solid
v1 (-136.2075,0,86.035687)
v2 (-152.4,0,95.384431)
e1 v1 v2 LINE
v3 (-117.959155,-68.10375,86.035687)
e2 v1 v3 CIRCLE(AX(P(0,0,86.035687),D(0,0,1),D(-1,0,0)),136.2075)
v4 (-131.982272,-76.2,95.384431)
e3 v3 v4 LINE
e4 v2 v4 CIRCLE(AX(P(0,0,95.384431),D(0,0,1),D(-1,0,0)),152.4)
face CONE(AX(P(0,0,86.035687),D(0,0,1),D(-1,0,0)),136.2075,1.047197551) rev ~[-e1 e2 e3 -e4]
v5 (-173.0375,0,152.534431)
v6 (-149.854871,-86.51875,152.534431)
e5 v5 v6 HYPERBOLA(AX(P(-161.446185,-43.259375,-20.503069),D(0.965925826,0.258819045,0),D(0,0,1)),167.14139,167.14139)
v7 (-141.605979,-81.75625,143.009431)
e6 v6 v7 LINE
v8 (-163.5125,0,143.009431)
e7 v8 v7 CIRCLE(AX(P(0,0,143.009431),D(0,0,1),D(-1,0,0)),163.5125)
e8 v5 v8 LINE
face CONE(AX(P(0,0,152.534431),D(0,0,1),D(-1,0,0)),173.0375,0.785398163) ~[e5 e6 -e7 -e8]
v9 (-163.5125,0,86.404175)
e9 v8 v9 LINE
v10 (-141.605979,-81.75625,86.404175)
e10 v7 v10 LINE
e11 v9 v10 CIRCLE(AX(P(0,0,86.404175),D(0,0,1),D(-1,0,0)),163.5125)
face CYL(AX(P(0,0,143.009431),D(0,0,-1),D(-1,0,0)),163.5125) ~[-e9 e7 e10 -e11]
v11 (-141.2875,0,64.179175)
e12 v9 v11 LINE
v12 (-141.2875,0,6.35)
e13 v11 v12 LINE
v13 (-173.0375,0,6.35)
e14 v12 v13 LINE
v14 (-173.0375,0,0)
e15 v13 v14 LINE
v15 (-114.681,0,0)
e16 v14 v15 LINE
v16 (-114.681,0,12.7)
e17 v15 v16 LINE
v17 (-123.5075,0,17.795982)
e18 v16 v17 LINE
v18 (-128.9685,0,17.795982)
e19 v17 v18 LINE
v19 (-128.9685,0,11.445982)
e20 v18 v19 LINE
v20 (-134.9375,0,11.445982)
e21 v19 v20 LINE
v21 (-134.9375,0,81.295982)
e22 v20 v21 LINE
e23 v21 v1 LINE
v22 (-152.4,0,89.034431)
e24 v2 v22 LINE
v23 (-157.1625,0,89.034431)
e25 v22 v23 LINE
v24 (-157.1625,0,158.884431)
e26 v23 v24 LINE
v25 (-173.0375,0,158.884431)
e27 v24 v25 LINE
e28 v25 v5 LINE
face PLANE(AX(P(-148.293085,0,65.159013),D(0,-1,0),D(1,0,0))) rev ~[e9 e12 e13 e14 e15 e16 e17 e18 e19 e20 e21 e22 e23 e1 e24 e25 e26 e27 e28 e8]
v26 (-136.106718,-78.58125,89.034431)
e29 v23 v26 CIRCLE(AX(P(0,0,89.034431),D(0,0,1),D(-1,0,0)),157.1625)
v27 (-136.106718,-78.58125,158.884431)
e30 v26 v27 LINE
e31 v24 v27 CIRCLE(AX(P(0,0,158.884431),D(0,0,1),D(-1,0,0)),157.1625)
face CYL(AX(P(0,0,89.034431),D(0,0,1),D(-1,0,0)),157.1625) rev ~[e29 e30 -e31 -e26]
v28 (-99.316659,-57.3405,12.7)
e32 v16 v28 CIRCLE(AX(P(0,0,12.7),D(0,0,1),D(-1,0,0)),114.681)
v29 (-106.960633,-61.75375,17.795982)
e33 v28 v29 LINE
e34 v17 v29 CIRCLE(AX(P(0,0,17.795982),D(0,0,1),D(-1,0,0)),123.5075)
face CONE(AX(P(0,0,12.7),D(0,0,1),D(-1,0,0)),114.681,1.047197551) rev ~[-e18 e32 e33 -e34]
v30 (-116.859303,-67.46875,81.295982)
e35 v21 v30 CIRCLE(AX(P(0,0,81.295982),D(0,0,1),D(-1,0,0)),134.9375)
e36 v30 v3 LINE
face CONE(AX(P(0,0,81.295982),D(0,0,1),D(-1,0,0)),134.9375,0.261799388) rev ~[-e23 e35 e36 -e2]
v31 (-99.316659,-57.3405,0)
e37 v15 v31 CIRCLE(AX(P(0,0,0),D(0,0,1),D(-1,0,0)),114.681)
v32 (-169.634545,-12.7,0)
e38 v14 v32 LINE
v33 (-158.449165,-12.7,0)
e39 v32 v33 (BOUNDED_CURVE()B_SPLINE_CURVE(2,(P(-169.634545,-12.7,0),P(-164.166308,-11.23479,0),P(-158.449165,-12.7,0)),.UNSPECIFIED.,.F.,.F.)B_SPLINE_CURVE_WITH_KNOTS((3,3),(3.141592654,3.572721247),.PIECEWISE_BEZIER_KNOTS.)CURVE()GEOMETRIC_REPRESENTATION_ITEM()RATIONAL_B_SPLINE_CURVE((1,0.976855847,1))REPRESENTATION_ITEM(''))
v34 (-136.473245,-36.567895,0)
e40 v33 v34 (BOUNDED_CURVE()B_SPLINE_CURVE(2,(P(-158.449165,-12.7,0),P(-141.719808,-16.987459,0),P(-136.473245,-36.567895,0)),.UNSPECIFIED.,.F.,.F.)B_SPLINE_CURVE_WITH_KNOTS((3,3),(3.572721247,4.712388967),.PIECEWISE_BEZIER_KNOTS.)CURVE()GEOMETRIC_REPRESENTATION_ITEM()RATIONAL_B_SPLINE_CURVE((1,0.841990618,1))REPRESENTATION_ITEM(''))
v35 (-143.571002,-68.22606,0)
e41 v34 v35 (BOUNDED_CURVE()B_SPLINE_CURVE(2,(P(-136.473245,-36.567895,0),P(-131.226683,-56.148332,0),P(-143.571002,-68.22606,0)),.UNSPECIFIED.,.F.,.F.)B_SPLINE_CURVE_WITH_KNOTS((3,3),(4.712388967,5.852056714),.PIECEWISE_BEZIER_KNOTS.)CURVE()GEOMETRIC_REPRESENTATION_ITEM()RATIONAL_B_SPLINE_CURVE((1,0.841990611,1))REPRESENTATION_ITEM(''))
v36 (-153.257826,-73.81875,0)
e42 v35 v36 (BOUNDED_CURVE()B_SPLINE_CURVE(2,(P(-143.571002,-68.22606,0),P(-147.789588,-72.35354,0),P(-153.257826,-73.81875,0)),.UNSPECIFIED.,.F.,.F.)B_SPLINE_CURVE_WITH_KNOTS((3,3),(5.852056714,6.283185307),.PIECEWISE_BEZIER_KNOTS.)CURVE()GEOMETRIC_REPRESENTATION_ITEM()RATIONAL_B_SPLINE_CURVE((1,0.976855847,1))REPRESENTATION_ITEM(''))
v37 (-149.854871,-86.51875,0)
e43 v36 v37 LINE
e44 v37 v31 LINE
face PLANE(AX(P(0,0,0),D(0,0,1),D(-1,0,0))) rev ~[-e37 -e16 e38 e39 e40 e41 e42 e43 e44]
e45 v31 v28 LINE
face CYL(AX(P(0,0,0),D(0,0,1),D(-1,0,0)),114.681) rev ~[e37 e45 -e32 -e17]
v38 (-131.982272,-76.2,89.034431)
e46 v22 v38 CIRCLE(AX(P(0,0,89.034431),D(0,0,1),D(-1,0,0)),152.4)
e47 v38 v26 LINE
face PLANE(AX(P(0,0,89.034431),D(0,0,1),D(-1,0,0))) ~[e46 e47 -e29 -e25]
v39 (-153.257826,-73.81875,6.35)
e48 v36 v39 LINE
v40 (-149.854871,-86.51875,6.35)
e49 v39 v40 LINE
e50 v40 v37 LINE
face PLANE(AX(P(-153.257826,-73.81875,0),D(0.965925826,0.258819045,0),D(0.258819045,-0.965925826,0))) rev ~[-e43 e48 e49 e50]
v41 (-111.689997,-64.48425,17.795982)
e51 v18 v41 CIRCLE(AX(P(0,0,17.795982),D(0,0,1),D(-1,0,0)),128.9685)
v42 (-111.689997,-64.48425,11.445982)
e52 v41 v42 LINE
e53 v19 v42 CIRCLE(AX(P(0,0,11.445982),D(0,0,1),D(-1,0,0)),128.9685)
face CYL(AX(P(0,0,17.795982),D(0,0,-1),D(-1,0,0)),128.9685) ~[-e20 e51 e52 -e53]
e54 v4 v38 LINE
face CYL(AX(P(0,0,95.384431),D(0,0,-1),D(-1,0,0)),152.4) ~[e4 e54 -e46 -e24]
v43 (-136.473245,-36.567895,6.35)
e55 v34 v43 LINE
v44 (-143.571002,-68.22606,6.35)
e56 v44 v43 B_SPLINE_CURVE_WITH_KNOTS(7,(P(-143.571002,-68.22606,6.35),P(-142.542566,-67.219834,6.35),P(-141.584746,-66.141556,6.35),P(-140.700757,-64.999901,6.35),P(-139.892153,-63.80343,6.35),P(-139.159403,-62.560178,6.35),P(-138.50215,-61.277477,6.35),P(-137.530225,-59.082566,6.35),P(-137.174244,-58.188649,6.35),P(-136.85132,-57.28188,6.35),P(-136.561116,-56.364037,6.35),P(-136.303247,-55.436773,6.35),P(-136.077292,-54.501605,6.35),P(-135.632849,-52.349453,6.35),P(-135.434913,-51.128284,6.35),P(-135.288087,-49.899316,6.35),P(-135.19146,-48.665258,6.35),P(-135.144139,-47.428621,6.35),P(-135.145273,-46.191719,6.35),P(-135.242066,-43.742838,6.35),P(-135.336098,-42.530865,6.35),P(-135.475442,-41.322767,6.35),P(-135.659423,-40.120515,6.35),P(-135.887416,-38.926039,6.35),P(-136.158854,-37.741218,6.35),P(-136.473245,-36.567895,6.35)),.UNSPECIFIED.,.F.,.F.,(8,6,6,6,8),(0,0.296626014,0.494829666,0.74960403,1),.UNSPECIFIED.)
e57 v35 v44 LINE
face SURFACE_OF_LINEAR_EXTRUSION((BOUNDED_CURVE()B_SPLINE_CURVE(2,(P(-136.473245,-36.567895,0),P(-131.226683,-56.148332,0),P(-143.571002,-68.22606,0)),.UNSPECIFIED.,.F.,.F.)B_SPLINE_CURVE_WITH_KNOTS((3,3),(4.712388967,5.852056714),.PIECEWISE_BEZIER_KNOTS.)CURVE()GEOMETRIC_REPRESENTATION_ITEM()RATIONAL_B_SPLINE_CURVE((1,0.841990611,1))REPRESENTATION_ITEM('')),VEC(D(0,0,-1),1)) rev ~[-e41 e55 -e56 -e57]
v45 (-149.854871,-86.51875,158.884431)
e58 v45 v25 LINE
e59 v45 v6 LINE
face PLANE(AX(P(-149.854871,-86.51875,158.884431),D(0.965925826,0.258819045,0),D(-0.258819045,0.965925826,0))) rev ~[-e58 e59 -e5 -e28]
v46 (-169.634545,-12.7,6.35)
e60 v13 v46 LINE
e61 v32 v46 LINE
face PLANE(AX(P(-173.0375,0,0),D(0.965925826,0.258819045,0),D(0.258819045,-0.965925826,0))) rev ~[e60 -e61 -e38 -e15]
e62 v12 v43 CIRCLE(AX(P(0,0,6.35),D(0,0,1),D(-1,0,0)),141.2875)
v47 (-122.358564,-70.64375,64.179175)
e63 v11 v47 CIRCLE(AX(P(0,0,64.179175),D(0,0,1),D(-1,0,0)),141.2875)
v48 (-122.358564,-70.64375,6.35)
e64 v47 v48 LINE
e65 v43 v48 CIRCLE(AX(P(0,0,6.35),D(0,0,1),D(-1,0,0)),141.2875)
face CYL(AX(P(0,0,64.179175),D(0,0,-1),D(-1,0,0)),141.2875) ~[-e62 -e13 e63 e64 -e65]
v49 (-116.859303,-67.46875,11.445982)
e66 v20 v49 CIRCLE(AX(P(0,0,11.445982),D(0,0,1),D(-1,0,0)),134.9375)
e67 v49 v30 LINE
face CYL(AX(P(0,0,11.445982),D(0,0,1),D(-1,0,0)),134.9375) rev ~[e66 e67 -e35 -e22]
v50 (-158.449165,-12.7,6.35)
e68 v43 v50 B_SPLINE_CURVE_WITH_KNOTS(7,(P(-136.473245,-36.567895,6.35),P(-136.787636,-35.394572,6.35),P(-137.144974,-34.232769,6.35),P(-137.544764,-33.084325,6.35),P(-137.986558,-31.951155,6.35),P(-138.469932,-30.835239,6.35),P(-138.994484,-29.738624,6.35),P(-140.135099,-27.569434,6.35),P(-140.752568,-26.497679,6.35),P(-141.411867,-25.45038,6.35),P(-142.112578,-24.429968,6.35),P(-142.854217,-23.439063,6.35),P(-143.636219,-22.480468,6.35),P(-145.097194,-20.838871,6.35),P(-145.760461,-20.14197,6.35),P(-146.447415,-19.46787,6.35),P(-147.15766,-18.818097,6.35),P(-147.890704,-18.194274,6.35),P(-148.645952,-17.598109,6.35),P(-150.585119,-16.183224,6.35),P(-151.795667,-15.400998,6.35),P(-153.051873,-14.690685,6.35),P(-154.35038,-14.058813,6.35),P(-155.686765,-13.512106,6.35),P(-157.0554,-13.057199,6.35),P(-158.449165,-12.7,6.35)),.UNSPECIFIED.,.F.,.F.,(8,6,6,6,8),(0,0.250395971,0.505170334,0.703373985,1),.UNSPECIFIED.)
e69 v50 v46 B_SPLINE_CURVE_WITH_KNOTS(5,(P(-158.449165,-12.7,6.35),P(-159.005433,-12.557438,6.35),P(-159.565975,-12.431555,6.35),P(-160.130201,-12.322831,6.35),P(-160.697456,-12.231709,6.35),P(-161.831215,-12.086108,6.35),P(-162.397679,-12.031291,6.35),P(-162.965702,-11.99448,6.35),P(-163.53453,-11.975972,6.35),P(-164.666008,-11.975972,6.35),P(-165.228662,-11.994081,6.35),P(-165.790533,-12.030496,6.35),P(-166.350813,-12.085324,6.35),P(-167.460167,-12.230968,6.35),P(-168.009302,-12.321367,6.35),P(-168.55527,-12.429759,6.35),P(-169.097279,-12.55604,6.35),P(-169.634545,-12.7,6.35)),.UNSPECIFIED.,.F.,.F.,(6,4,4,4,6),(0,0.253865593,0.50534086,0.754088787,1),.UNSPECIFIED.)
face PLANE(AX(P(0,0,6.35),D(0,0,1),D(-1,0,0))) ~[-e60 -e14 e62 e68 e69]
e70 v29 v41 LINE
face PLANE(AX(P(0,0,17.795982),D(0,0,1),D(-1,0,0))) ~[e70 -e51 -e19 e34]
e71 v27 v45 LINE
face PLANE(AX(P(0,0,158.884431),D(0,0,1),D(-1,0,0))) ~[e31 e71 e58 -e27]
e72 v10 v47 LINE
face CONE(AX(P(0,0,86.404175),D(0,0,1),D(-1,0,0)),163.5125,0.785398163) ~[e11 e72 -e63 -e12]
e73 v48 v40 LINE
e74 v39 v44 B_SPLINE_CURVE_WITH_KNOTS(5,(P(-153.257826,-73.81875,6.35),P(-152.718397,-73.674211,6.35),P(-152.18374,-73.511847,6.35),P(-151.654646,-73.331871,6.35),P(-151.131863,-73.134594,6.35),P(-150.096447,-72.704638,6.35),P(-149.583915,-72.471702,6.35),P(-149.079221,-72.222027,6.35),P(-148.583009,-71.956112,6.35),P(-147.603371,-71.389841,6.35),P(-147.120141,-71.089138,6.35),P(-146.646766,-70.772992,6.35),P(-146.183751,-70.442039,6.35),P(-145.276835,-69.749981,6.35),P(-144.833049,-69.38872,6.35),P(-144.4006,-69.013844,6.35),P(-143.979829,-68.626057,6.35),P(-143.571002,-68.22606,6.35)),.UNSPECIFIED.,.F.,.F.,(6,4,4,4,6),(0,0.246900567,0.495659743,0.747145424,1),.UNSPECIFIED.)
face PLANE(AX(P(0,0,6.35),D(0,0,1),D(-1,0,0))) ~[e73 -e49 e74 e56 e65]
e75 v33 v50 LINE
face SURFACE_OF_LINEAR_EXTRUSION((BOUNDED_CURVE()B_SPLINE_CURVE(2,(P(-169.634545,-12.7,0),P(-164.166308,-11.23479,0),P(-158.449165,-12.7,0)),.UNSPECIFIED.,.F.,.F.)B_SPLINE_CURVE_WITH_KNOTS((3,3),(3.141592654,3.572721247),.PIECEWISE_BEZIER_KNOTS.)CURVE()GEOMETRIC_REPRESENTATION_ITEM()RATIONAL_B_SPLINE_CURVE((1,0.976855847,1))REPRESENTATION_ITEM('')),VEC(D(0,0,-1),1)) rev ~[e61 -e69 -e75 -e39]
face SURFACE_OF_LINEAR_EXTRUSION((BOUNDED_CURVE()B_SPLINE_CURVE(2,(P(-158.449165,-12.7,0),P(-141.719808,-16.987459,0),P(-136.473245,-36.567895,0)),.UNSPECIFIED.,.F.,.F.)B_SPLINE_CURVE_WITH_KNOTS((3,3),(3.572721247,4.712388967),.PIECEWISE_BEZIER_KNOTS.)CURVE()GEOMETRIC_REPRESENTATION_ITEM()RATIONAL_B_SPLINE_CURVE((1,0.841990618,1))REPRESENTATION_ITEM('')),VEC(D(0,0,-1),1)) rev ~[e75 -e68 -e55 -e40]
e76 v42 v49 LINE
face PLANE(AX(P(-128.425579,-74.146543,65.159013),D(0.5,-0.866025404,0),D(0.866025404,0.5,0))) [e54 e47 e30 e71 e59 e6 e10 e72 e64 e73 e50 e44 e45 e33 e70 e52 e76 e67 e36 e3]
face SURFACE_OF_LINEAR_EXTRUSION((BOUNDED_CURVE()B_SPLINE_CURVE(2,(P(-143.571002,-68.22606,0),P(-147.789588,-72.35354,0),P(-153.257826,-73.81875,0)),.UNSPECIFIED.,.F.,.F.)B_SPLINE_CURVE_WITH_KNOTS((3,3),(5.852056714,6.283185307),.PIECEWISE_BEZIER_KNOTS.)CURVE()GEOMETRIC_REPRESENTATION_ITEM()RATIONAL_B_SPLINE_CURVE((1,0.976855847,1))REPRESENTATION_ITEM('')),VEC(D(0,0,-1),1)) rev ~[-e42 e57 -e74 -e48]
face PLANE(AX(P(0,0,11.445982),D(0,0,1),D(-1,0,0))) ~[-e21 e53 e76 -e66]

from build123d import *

# Parameters (mm, degrees)
F1_ANGLE = 30
F3_DEPTH = 25.4
F5_DEPTH = 25.4


with BuildPart() as f1:
    # F0 (on Front) → F1 (revolve)
    with BuildSketch(Plane.XZ):
        Polygon((-173.0375, 6.35), (-173.0375, 0), (-114.681, 0), (-114.681, 12.7), (-123.5075, 17.795982151), (-128.9685, 17.795982151), (-128.9685, 11.445982151), (-134.9375, 11.445982151), (-134.9375, 81.295982151), (-136.2075, 86.0356866766), (-152.4, 95.3844309105), (-152.4, 89.0344309105), (-157.1625, 89.0344309105), (-157.1625, 158.8844309105), (-173.0375, 158.8844309105), (-173.0375, 152.5344309105), (-163.5125, 143.0094309105), (-163.5125, 86.4041747894), (-141.2875, 64.1791747894), (-141.2875, 6.35), align=None)
    revolve(axis=Axis((0, 0, 96.6527089477), (0, 0, 1)), revolution_arc=F1_ANGLE)

    # F2 (on face) → F3 (cut)
    with BuildSketch(Plane(origin=(0, 0, 0), x_dir=(1, 0, 0), z_dir=(0, 0, -1))):
        with BuildLine():
            Line((-182.2236834316, 21.7005722844), (-168.6606251651, 72.3185948408))
            add(Edge.make_bspline(
                [(-168.6606251651, 72.3185948408), (-206.0052829566, 55.1989492048), (-182.2236834316, 21.7005722844)],
                knots=[0.5949234727, 0.5949234727, 0.5949234727, 2.5466691809, 2.5466691809, 2.5466691809], degree=2, weights=[1, 0.5604453769, 1]))
        make_face()
        with BuildLine():
            add(Edge.make_bspline(
                [(-143.5710023784, 68.2260600336), (-147.7895884166, 72.3535402758), (-153.2578255512, 73.81875)],
                knots=[5.8520567138, 5.8520567138, 5.8520567138, 6.2831853072, 6.2831853072, 6.2831853072], degree=2, weights=[1, 0.9768558474, 1]))
            Line((-153.2578255512, 73.81875), (-143.5710023784, 68.2260600336))
        make_face()
        with BuildLine():
            Line((-158.4491653232, 12.7), (-169.6345452561, 12.7))
            add(Edge.make_bspline(
                [(-169.6345452561, 12.7), (-164.1663081215, 11.2347902758), (-158.4491653232, 12.7)],
                knots=[3.1415926536, 3.1415926536, 3.1415926536, 3.572721247, 3.572721247, 3.572721247], degree=2, weights=[1, 0.9768558474, 1]))
        make_face()
        with BuildLine():
            Line((-143.5710023784, 68.2260600336), (-153.2578255512, 73.81875))
            Line((-153.2578255512, 73.81875), (-169.6345452561, 12.7))
            Line((-169.6345452561, 12.7), (-158.4491653232, 12.7))
            add(Edge.make_bspline(
                [(-158.4491653232, 12.7), (-141.7198075312, 16.987459415), (-136.4732452884, 36.5678954371)],
                knots=[3.572721247, 3.572721247, 3.572721247, 4.7123889674, 4.7123889674, 4.7123889674], degree=2, weights=[1, 0.8419906179, 1]))
            add(Edge.make_bspline(
                [(-136.4732452884, 36.5678954371), (-131.2266828952, 56.1483320204), (-143.5710023784, 68.2260600336)],
                knots=[4.7123889674, 4.7123889674, 4.7123889674, 5.8520567138, 5.8520567138, 5.8520567138], degree=2, weights=[1, 0.8419906109, 1]))
        make_face()
        with BuildLine():
            ThreePointArc((-173.0375, 0), (-172.9018353284, 6.8506748809), (-172.4950540409, 13.6906076446))
            add(Edge.make_bspline(
                [(-182.2236834316, 21.7005722844), (-178.3035736311, 16.1787689453), (-172.4950540409, 13.6906076446)],
                knots=[2.5466691809, 2.5466691809, 2.5466691809, 3.0245373947, 3.0245373947, 3.0245373947], degree=2, weights=[1, 0.9715907886, 1]))
            Line((-182.2236834316, 21.7005722844), (-188.0383342505, 0))
            Line((-188.0383342505, 0), (-173.0375, 0))
        make_face()
        with BuildLine():
            ThreePointArc((-156.2304026489, 74.391113007), (-153.1627191958, 80.5180591843), (-149.8548708073, 86.51875))
            Line((-149.8548708073, 86.51875), (-162.8085898503, 94.1586879635))
            Line((-162.8085898503, 94.1586879635), (-168.6606251651, 72.3185948408))
            add(Edge.make_bspline(
                [(-156.2304026489, 74.391113007), (-162.5048088227, 75.140561907), (-168.6606251651, 72.3185948408)],
                knots=[0.1170552589, 0.1170552589, 0.1170552589, 0.5949234727, 0.5949234727, 0.5949234727], degree=2, weights=[1, 0.9715907886, 1]))
        make_face()
        with BuildLine():
            Line((-153.2578255512, 73.81875), (-149.8548708073, 86.51875))
            ThreePointArc((-149.8548708073, 86.51875), (-153.1627191958, 80.5180591843), (-156.2304026489, 74.391113007))
            add(Edge.make_bspline(
                [(-153.2578255512, 73.81875), (-154.7211037363, 74.210834208), (-156.2304026489, 74.391113007)],
                knots=[0, 0, 0, 0.1170552589, 0.1170552589, 0.1170552589], degree=2, weights=[1, 0.9982877472, 1]))
        make_face()
        with BuildLine():
            Line((-173.0375, 0), (-169.6345452561, 12.7))
            add(Edge.make_bspline(
                [(-172.4950540409, 13.6906076446), (-171.0978234412, 13.092084208), (-169.6345452561, 12.7)],
                knots=[3.0245373947, 3.0245373947, 3.0245373947, 3.1415926536, 3.1415926536, 3.1415926536], degree=2, weights=[1, 0.9982877472, 1]))
            ThreePointArc((-172.4950540409, 13.6906076446), (-172.9018353284, 6.8506748809), (-173.0375, 0))
        make_face()
        with BuildLine():
            Line((-169.6345452561, 12.7), (-153.2578255512, 73.81875))
            add(Edge.make_bspline(
                [(-153.2578255512, 73.81875), (-154.7211037363, 74.210834208), (-156.2304026489, 74.391113007)],
                knots=[0, 0, 0, 0.1170552589, 0.1170552589, 0.1170552589], degree=2, weights=[1, 0.9982877472, 1]))
            ThreePointArc((-156.2304026489, 74.391113007), (-167.1413901665, 44.7854005169), (-172.4950540409, 13.6906076446))
            add(Edge.make_bspline(
                [(-172.4950540409, 13.6906076446), (-171.0978234412, 13.092084208), (-169.6345452561, 12.7)],
                knots=[3.0245373947, 3.0245373947, 3.0245373947, 3.1415926536, 3.1415926536, 3.1415926536], degree=2, weights=[1, 0.9982877472, 1]))
        make_face()
        with BuildLine():
            ThreePointArc((-172.4950540409, 13.6906076446), (-167.1413901665, 44.7854005169), (-156.2304026489, 74.391113007))
            add(Edge.make_bspline(
                [(-156.2304026489, 74.391113007), (-162.5048088227, 75.140561907), (-168.6606251651, 72.3185948408)],
                knots=[0.1170552589, 0.1170552589, 0.1170552589, 0.5949234727, 0.5949234727, 0.5949234727], degree=2, weights=[1, 0.9715907886, 1]))
            Line((-168.6606251651, 72.3185948408), (-182.2236834316, 21.7005722844))
            add(Edge.make_bspline(
                [(-182.2236834316, 21.7005722844), (-178.3035736311, 16.1787689453), (-172.4950540409, 13.6906076446)],
                knots=[2.5466691809, 2.5466691809, 2.5466691809, 3.0245373947, 3.0245373947, 3.0245373947], degree=2, weights=[1, 0.9715907886, 1]))
        make_face()
    extrude(amount=-F3_DEPTH, mode=Mode.SUBTRACT)

    # F4 (on face) → F5 (cut)
    with BuildSketch(Plane.XY.offset(158.8844309105)):
        Polygon((-149.8548708073, -86.51875), (-173.0375, 0), (-187.3384565115, -4.9058394507), (-165.3621643782, -86.51875), align=None)
    extrude(amount=-F5_DEPTH, mode=Mode.SUBTRACT)


solid = f1.part
